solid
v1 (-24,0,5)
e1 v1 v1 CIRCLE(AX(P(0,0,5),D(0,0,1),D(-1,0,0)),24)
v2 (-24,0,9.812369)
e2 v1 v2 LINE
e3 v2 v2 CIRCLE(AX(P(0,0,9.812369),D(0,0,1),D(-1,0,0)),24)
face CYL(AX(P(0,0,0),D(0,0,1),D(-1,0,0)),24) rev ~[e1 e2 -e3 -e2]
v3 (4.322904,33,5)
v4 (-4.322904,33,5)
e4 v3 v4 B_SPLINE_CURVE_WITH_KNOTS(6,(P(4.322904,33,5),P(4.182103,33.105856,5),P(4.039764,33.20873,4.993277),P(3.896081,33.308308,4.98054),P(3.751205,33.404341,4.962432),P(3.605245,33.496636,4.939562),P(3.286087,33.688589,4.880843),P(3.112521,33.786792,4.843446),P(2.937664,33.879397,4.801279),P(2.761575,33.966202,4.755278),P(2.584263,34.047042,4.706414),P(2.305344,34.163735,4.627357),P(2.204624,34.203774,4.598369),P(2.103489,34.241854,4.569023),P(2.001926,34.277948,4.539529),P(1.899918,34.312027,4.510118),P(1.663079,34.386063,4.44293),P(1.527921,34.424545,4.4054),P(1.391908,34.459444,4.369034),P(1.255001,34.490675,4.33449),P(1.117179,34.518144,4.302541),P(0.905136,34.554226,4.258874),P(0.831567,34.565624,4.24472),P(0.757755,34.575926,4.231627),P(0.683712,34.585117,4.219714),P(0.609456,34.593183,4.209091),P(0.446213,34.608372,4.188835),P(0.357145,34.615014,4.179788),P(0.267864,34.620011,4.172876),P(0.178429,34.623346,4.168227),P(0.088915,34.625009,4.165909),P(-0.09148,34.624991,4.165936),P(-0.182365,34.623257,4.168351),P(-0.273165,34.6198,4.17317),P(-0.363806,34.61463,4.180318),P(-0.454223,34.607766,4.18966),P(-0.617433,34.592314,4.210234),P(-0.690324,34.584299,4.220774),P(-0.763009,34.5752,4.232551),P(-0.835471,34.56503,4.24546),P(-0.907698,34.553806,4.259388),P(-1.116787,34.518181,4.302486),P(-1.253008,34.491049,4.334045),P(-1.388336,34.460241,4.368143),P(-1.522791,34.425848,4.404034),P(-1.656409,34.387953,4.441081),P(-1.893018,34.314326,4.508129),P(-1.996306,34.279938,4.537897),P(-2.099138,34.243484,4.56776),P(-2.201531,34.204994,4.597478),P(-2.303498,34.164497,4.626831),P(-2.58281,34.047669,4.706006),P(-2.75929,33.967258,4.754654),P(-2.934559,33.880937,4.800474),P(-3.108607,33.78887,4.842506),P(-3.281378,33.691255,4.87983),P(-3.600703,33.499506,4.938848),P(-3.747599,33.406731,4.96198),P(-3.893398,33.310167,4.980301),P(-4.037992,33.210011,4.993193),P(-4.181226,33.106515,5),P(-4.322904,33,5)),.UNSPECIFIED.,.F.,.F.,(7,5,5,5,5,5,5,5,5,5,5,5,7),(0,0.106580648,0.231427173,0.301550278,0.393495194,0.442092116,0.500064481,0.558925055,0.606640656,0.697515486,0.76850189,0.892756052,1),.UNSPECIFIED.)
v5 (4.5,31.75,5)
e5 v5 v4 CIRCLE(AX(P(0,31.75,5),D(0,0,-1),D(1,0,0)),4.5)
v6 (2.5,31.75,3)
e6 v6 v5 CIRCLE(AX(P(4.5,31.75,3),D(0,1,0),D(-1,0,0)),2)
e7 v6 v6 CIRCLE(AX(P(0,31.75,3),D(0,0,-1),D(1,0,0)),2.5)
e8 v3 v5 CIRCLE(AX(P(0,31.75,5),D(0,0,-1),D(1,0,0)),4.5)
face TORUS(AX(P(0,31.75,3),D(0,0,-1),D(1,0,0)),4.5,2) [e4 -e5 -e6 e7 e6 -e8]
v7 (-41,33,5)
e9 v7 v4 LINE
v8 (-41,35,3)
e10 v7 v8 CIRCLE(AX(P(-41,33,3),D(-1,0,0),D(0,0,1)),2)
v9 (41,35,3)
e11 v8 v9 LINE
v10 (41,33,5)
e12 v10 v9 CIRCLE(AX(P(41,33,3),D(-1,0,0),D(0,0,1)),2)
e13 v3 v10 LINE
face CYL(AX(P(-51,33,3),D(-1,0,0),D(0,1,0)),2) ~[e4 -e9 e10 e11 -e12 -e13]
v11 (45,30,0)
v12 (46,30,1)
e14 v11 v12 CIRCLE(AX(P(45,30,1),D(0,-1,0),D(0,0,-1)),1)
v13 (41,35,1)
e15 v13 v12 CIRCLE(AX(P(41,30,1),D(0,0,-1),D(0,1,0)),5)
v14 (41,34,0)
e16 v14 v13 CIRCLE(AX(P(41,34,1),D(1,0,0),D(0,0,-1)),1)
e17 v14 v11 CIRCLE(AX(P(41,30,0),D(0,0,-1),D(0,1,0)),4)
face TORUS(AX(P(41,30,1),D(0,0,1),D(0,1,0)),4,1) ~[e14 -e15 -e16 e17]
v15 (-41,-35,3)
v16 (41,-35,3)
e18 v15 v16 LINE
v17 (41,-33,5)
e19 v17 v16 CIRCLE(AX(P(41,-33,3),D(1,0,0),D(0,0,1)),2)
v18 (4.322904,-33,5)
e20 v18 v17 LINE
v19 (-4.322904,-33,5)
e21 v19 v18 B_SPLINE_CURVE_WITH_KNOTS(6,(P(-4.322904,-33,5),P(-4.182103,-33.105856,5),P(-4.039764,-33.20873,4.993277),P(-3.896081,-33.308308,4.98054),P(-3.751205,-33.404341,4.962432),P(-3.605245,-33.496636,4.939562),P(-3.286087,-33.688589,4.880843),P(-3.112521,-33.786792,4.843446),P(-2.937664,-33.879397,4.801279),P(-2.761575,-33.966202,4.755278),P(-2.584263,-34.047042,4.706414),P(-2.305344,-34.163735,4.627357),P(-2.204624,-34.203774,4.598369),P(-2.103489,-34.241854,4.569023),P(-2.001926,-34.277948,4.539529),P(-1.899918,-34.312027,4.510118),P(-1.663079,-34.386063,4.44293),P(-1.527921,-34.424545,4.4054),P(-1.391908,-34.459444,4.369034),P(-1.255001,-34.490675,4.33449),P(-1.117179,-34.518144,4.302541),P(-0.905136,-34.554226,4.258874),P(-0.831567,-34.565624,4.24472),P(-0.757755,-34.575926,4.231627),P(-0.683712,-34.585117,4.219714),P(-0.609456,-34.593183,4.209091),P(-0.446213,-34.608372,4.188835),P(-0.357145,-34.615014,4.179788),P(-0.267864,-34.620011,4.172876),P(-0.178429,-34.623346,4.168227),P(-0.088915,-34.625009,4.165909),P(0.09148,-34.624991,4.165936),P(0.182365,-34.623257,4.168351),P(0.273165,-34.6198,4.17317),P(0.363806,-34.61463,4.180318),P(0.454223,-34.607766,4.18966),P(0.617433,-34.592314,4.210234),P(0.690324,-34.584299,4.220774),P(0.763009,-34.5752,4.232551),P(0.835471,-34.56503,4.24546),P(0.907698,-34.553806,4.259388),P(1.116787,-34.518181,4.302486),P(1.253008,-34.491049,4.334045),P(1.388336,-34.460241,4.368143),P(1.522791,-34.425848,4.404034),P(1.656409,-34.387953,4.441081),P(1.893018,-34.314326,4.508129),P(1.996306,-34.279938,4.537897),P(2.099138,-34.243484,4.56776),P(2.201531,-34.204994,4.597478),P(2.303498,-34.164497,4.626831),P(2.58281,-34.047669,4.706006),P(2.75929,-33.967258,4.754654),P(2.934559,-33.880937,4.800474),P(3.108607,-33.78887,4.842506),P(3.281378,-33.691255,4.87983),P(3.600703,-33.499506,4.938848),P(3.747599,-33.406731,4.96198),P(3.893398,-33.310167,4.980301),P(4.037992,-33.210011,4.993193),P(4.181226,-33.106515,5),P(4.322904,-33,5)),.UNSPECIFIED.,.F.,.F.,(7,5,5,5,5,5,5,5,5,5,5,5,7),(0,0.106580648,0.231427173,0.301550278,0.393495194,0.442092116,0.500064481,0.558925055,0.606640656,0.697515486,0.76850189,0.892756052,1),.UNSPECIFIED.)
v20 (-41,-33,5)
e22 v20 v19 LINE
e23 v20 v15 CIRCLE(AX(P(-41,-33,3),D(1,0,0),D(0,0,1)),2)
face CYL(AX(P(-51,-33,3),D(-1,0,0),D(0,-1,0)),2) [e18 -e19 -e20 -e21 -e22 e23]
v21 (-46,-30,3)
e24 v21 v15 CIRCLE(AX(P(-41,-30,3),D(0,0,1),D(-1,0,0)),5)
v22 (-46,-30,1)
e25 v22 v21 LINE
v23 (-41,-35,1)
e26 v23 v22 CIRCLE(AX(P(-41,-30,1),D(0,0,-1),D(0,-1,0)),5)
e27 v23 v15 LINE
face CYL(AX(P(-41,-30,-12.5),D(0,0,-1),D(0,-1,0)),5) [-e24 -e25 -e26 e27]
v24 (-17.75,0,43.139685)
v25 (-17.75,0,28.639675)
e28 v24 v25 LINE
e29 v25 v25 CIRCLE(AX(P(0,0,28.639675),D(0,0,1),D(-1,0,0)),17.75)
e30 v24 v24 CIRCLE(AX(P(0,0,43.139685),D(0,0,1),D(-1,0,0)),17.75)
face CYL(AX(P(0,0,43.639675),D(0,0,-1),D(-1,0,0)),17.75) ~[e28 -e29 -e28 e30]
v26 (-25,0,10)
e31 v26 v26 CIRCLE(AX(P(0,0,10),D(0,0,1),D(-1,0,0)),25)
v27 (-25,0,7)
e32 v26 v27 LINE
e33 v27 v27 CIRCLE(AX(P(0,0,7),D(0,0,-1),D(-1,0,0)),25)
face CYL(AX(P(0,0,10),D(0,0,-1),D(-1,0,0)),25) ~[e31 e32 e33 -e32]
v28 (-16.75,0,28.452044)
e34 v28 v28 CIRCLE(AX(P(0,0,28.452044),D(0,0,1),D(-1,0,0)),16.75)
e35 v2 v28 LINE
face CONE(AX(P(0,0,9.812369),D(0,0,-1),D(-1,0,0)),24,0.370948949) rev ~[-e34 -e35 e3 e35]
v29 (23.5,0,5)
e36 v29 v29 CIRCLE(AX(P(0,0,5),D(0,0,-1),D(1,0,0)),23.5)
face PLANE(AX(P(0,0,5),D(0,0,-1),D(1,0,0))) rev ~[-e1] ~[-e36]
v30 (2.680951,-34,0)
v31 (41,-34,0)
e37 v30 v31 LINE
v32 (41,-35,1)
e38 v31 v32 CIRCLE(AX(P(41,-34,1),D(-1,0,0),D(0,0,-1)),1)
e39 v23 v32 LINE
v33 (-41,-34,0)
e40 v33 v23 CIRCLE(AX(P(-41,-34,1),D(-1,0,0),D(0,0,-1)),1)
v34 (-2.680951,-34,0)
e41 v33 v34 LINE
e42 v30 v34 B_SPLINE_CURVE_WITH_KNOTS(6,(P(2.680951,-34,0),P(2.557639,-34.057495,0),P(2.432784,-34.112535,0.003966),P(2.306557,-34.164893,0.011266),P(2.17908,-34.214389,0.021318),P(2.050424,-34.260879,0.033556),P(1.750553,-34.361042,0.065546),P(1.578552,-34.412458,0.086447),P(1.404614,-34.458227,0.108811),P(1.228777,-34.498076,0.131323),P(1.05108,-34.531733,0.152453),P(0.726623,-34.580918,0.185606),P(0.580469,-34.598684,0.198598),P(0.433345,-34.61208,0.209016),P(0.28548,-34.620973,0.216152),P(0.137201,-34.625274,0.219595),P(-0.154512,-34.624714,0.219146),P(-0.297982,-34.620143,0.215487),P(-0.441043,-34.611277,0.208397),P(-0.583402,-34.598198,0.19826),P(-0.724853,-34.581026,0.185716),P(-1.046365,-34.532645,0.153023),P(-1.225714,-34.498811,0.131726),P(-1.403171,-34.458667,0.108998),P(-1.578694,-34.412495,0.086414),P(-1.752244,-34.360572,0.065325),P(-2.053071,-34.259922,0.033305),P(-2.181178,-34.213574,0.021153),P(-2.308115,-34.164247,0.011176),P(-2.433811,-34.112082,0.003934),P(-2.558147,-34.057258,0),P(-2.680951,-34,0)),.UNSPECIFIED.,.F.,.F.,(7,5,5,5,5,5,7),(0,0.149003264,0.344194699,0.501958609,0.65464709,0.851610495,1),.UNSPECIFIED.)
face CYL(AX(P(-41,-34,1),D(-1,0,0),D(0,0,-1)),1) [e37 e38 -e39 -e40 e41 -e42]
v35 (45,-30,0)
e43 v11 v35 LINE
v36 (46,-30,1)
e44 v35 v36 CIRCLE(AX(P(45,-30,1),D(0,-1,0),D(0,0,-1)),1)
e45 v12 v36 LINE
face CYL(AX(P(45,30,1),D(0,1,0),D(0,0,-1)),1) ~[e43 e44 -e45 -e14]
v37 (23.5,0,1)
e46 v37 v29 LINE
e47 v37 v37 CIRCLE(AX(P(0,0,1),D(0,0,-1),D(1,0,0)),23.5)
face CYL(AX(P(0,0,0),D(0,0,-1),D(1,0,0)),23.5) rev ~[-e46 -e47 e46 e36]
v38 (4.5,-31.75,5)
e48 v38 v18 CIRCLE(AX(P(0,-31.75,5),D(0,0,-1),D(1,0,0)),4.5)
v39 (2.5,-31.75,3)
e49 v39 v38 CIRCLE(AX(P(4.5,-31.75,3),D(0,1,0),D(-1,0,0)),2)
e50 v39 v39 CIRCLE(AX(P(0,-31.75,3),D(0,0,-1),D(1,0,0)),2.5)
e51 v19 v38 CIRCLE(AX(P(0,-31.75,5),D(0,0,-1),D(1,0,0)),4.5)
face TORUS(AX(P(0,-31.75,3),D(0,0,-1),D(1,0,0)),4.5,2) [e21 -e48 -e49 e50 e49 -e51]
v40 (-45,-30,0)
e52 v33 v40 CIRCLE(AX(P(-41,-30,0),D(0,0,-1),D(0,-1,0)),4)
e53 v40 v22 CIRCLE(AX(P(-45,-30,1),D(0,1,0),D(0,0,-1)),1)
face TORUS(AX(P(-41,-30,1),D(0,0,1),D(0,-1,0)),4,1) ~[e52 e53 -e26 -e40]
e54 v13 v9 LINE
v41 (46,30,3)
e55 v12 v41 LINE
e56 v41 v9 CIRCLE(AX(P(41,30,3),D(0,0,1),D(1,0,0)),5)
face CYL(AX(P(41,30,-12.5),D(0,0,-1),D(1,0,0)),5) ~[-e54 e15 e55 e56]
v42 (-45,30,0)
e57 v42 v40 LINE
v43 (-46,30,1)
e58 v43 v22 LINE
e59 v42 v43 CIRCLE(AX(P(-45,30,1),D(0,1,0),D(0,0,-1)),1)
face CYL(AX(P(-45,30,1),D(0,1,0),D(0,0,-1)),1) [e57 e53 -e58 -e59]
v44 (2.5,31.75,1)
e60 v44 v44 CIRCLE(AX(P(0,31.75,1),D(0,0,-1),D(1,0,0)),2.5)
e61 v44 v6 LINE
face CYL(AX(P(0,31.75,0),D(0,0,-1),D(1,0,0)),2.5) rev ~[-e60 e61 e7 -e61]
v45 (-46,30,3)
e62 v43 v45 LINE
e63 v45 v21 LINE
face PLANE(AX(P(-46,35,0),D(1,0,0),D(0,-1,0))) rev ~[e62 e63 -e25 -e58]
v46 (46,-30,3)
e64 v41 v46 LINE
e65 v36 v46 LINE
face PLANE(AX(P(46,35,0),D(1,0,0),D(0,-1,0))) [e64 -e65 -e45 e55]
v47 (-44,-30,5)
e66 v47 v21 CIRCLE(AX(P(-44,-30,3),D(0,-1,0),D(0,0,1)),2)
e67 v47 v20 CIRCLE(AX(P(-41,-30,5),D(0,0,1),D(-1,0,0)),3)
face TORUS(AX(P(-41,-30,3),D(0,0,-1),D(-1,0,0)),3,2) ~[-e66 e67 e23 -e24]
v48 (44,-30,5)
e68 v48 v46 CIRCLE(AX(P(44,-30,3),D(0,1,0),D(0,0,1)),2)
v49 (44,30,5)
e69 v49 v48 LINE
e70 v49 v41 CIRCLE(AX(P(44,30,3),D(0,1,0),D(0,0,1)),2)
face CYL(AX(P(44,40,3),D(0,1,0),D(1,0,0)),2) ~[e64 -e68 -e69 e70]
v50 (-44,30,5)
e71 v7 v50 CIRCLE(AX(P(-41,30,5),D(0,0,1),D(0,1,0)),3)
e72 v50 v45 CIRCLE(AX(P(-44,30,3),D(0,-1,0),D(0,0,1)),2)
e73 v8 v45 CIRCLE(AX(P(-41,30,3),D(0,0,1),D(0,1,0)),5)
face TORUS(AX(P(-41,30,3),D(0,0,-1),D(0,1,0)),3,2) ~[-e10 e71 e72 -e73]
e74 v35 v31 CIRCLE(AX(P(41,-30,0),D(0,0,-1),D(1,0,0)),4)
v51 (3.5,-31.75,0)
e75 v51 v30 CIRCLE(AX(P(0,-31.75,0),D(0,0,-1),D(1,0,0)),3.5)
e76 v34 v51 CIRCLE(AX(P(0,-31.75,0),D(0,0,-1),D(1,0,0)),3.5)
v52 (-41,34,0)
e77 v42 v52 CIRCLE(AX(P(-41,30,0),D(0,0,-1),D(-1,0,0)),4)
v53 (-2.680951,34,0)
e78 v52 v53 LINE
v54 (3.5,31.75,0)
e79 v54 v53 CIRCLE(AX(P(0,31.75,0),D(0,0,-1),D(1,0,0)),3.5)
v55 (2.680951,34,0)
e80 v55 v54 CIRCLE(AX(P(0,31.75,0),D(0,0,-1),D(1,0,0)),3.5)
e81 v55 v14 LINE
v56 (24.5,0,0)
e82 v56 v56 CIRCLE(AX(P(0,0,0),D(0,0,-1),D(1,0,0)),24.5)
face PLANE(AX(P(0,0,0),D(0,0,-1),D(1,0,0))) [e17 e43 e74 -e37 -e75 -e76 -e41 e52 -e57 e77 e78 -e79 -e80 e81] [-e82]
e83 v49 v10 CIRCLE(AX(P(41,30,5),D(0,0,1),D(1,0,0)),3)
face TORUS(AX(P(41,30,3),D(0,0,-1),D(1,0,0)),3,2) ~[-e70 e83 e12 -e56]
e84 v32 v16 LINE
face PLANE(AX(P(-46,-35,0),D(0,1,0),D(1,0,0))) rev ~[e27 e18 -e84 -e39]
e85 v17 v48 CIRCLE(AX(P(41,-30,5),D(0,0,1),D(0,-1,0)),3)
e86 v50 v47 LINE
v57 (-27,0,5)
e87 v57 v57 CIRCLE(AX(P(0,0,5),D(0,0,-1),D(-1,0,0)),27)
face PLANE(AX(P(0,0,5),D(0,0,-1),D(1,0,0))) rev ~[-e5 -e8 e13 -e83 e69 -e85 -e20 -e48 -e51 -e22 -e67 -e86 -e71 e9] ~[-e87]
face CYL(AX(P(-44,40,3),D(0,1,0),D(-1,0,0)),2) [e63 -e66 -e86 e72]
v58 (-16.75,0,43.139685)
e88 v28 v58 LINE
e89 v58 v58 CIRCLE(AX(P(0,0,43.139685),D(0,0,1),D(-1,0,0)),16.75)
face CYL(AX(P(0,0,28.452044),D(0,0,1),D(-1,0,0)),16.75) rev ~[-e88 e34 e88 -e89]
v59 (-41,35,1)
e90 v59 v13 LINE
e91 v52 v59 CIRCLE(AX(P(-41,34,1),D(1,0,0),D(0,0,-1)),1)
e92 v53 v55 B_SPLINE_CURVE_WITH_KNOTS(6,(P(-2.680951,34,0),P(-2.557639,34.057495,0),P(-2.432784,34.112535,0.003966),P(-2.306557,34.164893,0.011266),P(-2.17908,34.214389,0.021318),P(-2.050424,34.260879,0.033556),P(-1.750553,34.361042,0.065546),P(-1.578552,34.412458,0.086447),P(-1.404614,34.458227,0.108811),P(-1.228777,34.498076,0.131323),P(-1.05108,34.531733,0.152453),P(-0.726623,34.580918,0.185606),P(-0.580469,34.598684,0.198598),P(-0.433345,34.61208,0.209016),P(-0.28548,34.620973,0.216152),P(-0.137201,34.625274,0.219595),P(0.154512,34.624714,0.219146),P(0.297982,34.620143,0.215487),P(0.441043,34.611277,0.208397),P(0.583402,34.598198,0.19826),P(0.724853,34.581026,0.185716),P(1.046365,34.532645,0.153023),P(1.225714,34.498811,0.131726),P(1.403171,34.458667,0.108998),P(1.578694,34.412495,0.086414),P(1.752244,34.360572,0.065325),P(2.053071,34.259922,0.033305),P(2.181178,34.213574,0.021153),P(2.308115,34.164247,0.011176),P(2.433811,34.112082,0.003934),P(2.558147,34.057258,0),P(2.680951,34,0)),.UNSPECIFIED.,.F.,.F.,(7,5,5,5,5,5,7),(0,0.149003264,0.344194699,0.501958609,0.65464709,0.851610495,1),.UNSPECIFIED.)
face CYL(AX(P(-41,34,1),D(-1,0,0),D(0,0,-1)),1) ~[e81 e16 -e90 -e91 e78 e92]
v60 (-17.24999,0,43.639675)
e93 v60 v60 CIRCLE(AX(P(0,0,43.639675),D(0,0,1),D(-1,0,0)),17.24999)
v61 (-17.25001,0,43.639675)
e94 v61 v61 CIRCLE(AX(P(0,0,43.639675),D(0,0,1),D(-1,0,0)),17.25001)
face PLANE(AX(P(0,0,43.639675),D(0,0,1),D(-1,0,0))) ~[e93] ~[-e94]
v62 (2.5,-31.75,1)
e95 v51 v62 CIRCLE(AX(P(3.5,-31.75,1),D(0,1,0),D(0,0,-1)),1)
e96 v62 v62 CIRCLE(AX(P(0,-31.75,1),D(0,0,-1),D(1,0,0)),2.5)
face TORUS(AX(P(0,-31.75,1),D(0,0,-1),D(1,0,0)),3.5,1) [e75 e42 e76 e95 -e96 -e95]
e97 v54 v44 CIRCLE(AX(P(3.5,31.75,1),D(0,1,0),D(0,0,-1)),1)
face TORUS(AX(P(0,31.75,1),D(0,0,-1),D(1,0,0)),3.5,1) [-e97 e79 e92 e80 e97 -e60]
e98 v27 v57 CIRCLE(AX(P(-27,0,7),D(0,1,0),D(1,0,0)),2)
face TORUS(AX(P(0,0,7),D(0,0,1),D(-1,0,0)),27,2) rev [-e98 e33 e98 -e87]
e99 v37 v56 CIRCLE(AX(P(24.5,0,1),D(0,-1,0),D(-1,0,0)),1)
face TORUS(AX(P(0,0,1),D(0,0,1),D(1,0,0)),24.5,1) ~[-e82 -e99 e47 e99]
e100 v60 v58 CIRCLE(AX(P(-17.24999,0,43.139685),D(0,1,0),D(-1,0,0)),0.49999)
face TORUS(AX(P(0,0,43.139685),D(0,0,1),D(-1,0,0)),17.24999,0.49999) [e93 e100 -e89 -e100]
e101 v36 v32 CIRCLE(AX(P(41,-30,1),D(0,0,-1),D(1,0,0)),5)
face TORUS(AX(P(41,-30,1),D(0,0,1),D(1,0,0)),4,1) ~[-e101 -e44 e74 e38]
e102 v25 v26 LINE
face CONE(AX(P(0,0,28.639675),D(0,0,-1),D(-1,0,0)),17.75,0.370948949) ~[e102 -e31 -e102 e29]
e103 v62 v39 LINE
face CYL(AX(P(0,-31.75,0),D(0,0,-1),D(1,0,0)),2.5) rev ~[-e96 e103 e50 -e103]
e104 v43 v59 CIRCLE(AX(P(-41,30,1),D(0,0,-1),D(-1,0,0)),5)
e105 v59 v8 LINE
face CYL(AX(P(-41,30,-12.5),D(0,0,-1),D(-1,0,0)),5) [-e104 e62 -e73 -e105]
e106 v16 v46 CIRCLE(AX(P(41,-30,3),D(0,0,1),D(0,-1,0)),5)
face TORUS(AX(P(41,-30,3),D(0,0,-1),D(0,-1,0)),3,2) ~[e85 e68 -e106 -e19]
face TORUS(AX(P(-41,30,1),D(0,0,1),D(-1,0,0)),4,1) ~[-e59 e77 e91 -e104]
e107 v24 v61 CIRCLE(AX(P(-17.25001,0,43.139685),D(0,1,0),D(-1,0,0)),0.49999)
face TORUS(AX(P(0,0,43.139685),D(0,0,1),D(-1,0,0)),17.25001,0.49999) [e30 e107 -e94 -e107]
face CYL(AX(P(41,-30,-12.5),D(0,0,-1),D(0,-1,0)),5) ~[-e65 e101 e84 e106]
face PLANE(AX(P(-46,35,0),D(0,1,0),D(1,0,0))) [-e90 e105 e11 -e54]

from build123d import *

# Parameters (mm, degrees)
F3_W          = 92
F3_H          = 70
F3_R          = 2.5
F4_DEPTH      = 5
F5_R          = 23.5
F6_DEPTH      = 5
F7_T3_DEPTH   = 102
F7_T5_DEPTH   = 80
F8_T1_DEPTH   = 17.4999999999
F8_T4_ANGLE   = 90
F8_T6_ANGLE   = 90
F8_T8_ANGLE   = 90
F8_T10_ANGLE  = 90
F9_R          = 0.49999
F10_T1_DEPTH  = 60
F10_T3_DEPTH  = 82
F10_T6_ANGLE  = 89.9999999974
F10_T8_ANGLE  = 89.9999999974
F10_T10_ANGLE = 89.9999999974
F10_T12_ANGLE = 89.9999999974


# Not quite as in the source:
# - a fillet or chamfer that OpenCascade refuses, or shapes differently, is made with other operations: its cross-section is extruded or revolved along the edge and cut away or added
# - a fillet or chamfer is up to 0.001 mm smaller than in the source, because OpenCascade refuses the exact size


with BuildPart() as f1:
    # F0 (on Front) → F1 (revolve)
    with BuildSketch(Plane.XZ):
        Polygon((-25, 10), (-25, 0), (-24, 0), (-24, 9.8123690243), (-16.75, 28.4520444507), (-16.75, 43.6396754264), (-17.75, 43.6396754264), (-17.75, 28.6396754264), align=None)
    revolve(axis=Axis((0, 0, 23.4480407089), (0, 0, 1)))

    # F3 (on offset) → F4 (join)
    with BuildSketch(Plane(origin=(0, 0, 0), x_dir=(1, 0, 0), z_dir=(0, 0, -1))):
        Rectangle(F3_W, F3_H)
        with Locations((0, -31.75)):
            Circle(F3_R, mode=Mode.SUBTRACT)
        with Locations((0, 31.75)):
            Circle(F3_R, mode=Mode.SUBTRACT)
    extrude(amount=-F4_DEPTH)

    # F5 (on face) → F6 (cut, through all)
    with BuildSketch(Plane(origin=(0, 0, 0), x_dir=(1, 0, 0), z_dir=(0, 0, -1))):
        Circle(F5_R)
    extrude(amount=-F6_DEPTH, mode=Mode.SUBTRACT)

    # F7: fillet of radius 2 on 7 edges, made by hand

    # F7_s1 → F7_t2 (revolve)
    with BuildSketch(Plane.XZ):
        with BuildLine():
            ThreePointArc((-25, 7), (-25.5857864376, 5.5857864376), (-27, 5))
            Line((-27, 5), (-25, 5))
            Line((-25, 5), (-25, 7))
        make_face()
    revolve(axis=Axis((0, 0, 5), (0, 0, -1)))

    # F7_s4 → F7_t3 (cut)
    with BuildSketch(Plane.YZ.offset(-51)):
        with BuildLine():
            ThreePointArc((-35, 3), (-34.4142135624, 4.4142135624), (-33, 5))
            Line((-33, 5), (-35, 5))
            Line((-35, 5), (-35, 3))
        make_face()
        with BuildLine():
            ThreePointArc((35, 3), (34.4142135624, 4.4142135624), (33, 5))
            Line((33, 5), (35, 5))
            Line((35, 5), (35, 3))
        make_face()
    extrude(amount=F7_T3_DEPTH, mode=Mode.SUBTRACT)

    # F7_s6 → F7_t5 (cut)
    with BuildSketch(Plane.XZ.offset(-40)):
        with BuildLine():
            ThreePointArc((46, 3), (45.4142135624, 4.4142135624), (44, 5))
            Line((44, 5), (46, 5))
            Line((46, 5), (46, 3))
        make_face()
        with BuildLine():
            ThreePointArc((-46, 3), (-45.4142135624, 4.4142135624), (-44, 5))
            Line((-44, 5), (-46, 5))
            Line((-46, 5), (-46, 3))
        make_face()
    extrude(amount=F7_T5_DEPTH, mode=Mode.SUBTRACT)

    # F7_s7 → F7_t8 (revolve, cut)
    with BuildSketch(Plane.XZ.offset(-31.75)):
        with BuildLine():
            ThreePointArc((2.5, 3), (3.0857864376, 4.4142135624), (4.5, 5))
            Line((4.5, 5), (2.5, 5))
            Line((2.5, 5), (2.5, 3))
        make_face()
    revolve(axis=Axis((0, 31.75, 5), (0, 0, -1)), mode=Mode.SUBTRACT)

    # F7_s9 → F7_t10 (revolve, cut)
    with BuildSketch(Plane.XZ.offset(31.75)):
        with BuildLine():
            ThreePointArc((2.5, 3), (3.0857864376, 4.4142135624), (4.5, 5))
            Line((4.5, 5), (2.5, 5))
            Line((2.5, 5), (2.5, 3))
        make_face()
    revolve(axis=Axis((0, -31.75, 5), (0, 0, -1)), mode=Mode.SUBTRACT)

    # F8: fillet of radius 5 on 4 edges, made by hand

    # F8_s2 → F8_t1 (cut)
    with BuildSketch(Plane.XY.offset(-12.5)):
        with BuildLine():
            ThreePointArc((41, -35), (44.5355339059, -33.5355339059), (46, -30))
            Line((46, -30), (46, -35))
            Line((46, -35), (41, -35))
        make_face()
        with BuildLine():
            ThreePointArc((-41, -35), (-44.5355339059, -33.5355339059), (-46, -30))
            Line((-46, -30), (-46, -35))
            Line((-46, -35), (-41, -35))
        make_face()
        with BuildLine():
            ThreePointArc((-46, 30), (-44.5355339059, 33.5355339059), (-41, 35))
            Line((-41, 35), (-46, 35))
            Line((-46, 35), (-46, 30))
        make_face()
        with BuildLine():
            ThreePointArc((46, 30), (44.5355339059, 33.5355339059), (41, 35))
            Line((41, 35), (46, 35))
            Line((46, 35), (46, 30))
        make_face()
    extrude(amount=F8_T1_DEPTH, mode=Mode.SUBTRACT)

    # F8_s3 → F8_t4 (revolve, cut)
    with BuildSketch(Plane.XZ.offset(-30)):
        with BuildLine():
            ThreePointArc((44.0000000001, 5), (45.4142135624, 4.4142135624), (46, 3.0000000001))
            Line((46, 3.0000000001), (46, 5))
            Line((46, 5), (44.0000000001, 5))
        make_face()
    revolve(axis=Axis((41, 30, 5), (0, 0, 1)), revolution_arc=F8_T4_ANGLE, mode=Mode.SUBTRACT)

    # F8_s5 → F8_t6 (revolve, cut)
    with BuildSketch(Plane.YZ.offset(-41)):
        with BuildLine():
            ThreePointArc((33.0000000001, 5), (34.4142135624, 4.4142135624), (35, 3.0000000001))
            Line((35, 3.0000000001), (35, 5))
            Line((35, 5), (33.0000000001, 5))
        make_face()
    revolve(axis=Axis((-41, 30, 5), (0, 0, 1)), revolution_arc=F8_T6_ANGLE, mode=Mode.SUBTRACT)

    # F8_s7 → F8_t8 (revolve, cut)
    with BuildSketch(Plane.XZ.offset(30)):
        with BuildLine():
            ThreePointArc((-44.0000000001, 5), (-45.4142135624, 4.4142135624), (-46, 3.0000000001))
            Line((-46, 3.0000000001), (-46, 5))
            Line((-46, 5), (-44.0000000001, 5))
        make_face()
    revolve(axis=Axis((-41, -30, 5), (0, 0, 1)), revolution_arc=F8_T8_ANGLE, mode=Mode.SUBTRACT)

    # F8_s9 → F8_t10 (revolve, cut)
    with BuildSketch(Plane.YZ.offset(41)):
        with BuildLine():
            ThreePointArc((-33.0000000001, 5), (-34.4142135624, 4.4142135624), (-35, 3.0000000001))
            Line((-35, 3.0000000001), (-35, 5))
            Line((-35, 5), (-33.0000000001, 5))
        make_face()
    revolve(axis=Axis((41, -30, 5), (0, 0, 1)), revolution_arc=F8_T10_ANGLE, mode=Mode.SUBTRACT)

    # F9 (radius 0.5 in the source; OpenCascade refuses exactly that, so slightly less here)
    f9_edges = [f1.edges().sort_by_distance(p)[0] for p in [
        (16.75, 0, 43.639675),
        (17.75, 0, 43.639675),
    ]]
    fillet(f9_edges, radius=F9_R)

    # F10: fillet of radius 1 on 11 edges, made by hand

    # F10_s2 → F10_t1 (cut)
    with BuildSketch(Plane.XZ.offset(-30)):
        with BuildLine():
            ThreePointArc((45, 0), (45.7071067812, 0.2928932188), (46, 1))
            Line((46, 1), (46, 0))
            Line((46, 0), (45, 0))
        make_face()
        with BuildLine():
            ThreePointArc((-45, 0), (-45.7071067812, 0.2928932188), (-46, 1))
            Line((-46, 1), (-46, 0))
            Line((-46, 0), (-45, 0))
        make_face()
    extrude(amount=F10_T1_DEPTH, mode=Mode.SUBTRACT)

    # F10_s4 → F10_t3 (cut)
    with BuildSketch(Plane.YZ.offset(-41)):
        with BuildLine():
            ThreePointArc((34, 0), (34.7071067812, 0.2928932188), (35, 1))
            Line((35, 1), (35, 0))
            Line((35, 0), (34, 0))
        make_face()
        with BuildLine():
            ThreePointArc((-34, 0), (-34.7071067812, 0.2928932188), (-35, 1))
            Line((-35, 1), (-35, 0))
            Line((-35, 0), (-34, 0))
        make_face()
    extrude(amount=F10_T3_DEPTH, mode=Mode.SUBTRACT)

    # F10_s5 → F10_t6 (revolve, cut)
    with BuildSketch(Plane.XZ.offset(29.9999999999)):
        with BuildLine():
            ThreePointArc((45, 0), (45.7071067812, 0.2928932188), (46, 1))
            Line((46, 1), (46, 0))
            Line((46, 0), (45, 0))
        make_face()
    revolve(axis=Axis((40.9999999999, -29.9999999999, 0), (0, 0, -1)), revolution_arc=F10_T6_ANGLE, mode=Mode.SUBTRACT)

    # F10_s7 → F10_t8 (revolve, cut)
    with BuildSketch(Plane.YZ.offset(40.9999999999)):
        with BuildLine():
            ThreePointArc((34, 0), (34.7071067812, 0.2928932188), (35, 1))
            Line((35, 1), (35, 0))
            Line((35, 0), (34, 0))
        make_face()
    revolve(axis=Axis((40.9999999999, 29.9999999999, 0), (0, 0, -1)), revolution_arc=F10_T8_ANGLE, mode=Mode.SUBTRACT)

    # F10_s9 → F10_t10 (revolve, cut)
    with BuildSketch(Plane.XZ.offset(-29.9999999999)):
        with BuildLine():
            ThreePointArc((-45, 0), (-45.7071067812, 0.2928932188), (-46, 1))
            Line((-46, 1), (-46, 0))
            Line((-46, 0), (-45, 0))
        make_face()
    revolve(axis=Axis((-40.9999999999, 29.9999999999, 0), (0, 0, -1)), revolution_arc=F10_T10_ANGLE, mode=Mode.SUBTRACT)

    # F10_s11 → F10_t12 (revolve, cut)
    with BuildSketch(Plane.YZ.offset(-40.9999999999)):
        with BuildLine():
            ThreePointArc((-34, 0), (-34.7071067812, 0.2928932188), (-35, 1))
            Line((-35, 1), (-35, 0))
            Line((-35, 0), (-34, 0))
        make_face()
    revolve(axis=Axis((-40.9999999999, -29.9999999999, 0), (0, 0, -1)), revolution_arc=F10_T12_ANGLE, mode=Mode.SUBTRACT)

    # F10_s13 → F10_t14 (revolve, cut)
    with BuildSketch(Plane.XZ.offset(-31.75)):
        with BuildLine():
            ThreePointArc((3.5, 0), (2.7928932188, 0.2928932188), (2.5, 1))
            Line((2.5, 1), (2.5, 0))
            Line((2.5, 0), (3.5, 0))
        make_face()
    revolve(axis=Axis((0, 31.75, 0), (0, 0, -1)), mode=Mode.SUBTRACT)

    # F10_s15 → F10_t16 (revolve, cut)
    with BuildSketch(Plane.XZ):
        with BuildLine():
            ThreePointArc((23.5, 1), (23.7928932188, 0.2928932188), (24.5, 0))
            Line((24.5, 0), (23.5, 0))
            Line((23.5, 0), (23.5, 1))
        make_face()
    revolve(axis=Axis((0, 0, 0), (0, 0, -1)), mode=Mode.SUBTRACT)

    # F10_s17 → F10_t18 (revolve, cut)
    with BuildSketch(Plane.XZ.offset(31.75)):
        with BuildLine():
            ThreePointArc((3.5, 0), (2.7928932188, 0.2928932188), (2.5, 1))
            Line((2.5, 1), (2.5, 0))
            Line((2.5, 0), (3.5, 0))
        make_face()
    revolve(axis=Axis((0, -31.75, 0), (0, 0, -1)), mode=Mode.SUBTRACT)


solid = f1.part
